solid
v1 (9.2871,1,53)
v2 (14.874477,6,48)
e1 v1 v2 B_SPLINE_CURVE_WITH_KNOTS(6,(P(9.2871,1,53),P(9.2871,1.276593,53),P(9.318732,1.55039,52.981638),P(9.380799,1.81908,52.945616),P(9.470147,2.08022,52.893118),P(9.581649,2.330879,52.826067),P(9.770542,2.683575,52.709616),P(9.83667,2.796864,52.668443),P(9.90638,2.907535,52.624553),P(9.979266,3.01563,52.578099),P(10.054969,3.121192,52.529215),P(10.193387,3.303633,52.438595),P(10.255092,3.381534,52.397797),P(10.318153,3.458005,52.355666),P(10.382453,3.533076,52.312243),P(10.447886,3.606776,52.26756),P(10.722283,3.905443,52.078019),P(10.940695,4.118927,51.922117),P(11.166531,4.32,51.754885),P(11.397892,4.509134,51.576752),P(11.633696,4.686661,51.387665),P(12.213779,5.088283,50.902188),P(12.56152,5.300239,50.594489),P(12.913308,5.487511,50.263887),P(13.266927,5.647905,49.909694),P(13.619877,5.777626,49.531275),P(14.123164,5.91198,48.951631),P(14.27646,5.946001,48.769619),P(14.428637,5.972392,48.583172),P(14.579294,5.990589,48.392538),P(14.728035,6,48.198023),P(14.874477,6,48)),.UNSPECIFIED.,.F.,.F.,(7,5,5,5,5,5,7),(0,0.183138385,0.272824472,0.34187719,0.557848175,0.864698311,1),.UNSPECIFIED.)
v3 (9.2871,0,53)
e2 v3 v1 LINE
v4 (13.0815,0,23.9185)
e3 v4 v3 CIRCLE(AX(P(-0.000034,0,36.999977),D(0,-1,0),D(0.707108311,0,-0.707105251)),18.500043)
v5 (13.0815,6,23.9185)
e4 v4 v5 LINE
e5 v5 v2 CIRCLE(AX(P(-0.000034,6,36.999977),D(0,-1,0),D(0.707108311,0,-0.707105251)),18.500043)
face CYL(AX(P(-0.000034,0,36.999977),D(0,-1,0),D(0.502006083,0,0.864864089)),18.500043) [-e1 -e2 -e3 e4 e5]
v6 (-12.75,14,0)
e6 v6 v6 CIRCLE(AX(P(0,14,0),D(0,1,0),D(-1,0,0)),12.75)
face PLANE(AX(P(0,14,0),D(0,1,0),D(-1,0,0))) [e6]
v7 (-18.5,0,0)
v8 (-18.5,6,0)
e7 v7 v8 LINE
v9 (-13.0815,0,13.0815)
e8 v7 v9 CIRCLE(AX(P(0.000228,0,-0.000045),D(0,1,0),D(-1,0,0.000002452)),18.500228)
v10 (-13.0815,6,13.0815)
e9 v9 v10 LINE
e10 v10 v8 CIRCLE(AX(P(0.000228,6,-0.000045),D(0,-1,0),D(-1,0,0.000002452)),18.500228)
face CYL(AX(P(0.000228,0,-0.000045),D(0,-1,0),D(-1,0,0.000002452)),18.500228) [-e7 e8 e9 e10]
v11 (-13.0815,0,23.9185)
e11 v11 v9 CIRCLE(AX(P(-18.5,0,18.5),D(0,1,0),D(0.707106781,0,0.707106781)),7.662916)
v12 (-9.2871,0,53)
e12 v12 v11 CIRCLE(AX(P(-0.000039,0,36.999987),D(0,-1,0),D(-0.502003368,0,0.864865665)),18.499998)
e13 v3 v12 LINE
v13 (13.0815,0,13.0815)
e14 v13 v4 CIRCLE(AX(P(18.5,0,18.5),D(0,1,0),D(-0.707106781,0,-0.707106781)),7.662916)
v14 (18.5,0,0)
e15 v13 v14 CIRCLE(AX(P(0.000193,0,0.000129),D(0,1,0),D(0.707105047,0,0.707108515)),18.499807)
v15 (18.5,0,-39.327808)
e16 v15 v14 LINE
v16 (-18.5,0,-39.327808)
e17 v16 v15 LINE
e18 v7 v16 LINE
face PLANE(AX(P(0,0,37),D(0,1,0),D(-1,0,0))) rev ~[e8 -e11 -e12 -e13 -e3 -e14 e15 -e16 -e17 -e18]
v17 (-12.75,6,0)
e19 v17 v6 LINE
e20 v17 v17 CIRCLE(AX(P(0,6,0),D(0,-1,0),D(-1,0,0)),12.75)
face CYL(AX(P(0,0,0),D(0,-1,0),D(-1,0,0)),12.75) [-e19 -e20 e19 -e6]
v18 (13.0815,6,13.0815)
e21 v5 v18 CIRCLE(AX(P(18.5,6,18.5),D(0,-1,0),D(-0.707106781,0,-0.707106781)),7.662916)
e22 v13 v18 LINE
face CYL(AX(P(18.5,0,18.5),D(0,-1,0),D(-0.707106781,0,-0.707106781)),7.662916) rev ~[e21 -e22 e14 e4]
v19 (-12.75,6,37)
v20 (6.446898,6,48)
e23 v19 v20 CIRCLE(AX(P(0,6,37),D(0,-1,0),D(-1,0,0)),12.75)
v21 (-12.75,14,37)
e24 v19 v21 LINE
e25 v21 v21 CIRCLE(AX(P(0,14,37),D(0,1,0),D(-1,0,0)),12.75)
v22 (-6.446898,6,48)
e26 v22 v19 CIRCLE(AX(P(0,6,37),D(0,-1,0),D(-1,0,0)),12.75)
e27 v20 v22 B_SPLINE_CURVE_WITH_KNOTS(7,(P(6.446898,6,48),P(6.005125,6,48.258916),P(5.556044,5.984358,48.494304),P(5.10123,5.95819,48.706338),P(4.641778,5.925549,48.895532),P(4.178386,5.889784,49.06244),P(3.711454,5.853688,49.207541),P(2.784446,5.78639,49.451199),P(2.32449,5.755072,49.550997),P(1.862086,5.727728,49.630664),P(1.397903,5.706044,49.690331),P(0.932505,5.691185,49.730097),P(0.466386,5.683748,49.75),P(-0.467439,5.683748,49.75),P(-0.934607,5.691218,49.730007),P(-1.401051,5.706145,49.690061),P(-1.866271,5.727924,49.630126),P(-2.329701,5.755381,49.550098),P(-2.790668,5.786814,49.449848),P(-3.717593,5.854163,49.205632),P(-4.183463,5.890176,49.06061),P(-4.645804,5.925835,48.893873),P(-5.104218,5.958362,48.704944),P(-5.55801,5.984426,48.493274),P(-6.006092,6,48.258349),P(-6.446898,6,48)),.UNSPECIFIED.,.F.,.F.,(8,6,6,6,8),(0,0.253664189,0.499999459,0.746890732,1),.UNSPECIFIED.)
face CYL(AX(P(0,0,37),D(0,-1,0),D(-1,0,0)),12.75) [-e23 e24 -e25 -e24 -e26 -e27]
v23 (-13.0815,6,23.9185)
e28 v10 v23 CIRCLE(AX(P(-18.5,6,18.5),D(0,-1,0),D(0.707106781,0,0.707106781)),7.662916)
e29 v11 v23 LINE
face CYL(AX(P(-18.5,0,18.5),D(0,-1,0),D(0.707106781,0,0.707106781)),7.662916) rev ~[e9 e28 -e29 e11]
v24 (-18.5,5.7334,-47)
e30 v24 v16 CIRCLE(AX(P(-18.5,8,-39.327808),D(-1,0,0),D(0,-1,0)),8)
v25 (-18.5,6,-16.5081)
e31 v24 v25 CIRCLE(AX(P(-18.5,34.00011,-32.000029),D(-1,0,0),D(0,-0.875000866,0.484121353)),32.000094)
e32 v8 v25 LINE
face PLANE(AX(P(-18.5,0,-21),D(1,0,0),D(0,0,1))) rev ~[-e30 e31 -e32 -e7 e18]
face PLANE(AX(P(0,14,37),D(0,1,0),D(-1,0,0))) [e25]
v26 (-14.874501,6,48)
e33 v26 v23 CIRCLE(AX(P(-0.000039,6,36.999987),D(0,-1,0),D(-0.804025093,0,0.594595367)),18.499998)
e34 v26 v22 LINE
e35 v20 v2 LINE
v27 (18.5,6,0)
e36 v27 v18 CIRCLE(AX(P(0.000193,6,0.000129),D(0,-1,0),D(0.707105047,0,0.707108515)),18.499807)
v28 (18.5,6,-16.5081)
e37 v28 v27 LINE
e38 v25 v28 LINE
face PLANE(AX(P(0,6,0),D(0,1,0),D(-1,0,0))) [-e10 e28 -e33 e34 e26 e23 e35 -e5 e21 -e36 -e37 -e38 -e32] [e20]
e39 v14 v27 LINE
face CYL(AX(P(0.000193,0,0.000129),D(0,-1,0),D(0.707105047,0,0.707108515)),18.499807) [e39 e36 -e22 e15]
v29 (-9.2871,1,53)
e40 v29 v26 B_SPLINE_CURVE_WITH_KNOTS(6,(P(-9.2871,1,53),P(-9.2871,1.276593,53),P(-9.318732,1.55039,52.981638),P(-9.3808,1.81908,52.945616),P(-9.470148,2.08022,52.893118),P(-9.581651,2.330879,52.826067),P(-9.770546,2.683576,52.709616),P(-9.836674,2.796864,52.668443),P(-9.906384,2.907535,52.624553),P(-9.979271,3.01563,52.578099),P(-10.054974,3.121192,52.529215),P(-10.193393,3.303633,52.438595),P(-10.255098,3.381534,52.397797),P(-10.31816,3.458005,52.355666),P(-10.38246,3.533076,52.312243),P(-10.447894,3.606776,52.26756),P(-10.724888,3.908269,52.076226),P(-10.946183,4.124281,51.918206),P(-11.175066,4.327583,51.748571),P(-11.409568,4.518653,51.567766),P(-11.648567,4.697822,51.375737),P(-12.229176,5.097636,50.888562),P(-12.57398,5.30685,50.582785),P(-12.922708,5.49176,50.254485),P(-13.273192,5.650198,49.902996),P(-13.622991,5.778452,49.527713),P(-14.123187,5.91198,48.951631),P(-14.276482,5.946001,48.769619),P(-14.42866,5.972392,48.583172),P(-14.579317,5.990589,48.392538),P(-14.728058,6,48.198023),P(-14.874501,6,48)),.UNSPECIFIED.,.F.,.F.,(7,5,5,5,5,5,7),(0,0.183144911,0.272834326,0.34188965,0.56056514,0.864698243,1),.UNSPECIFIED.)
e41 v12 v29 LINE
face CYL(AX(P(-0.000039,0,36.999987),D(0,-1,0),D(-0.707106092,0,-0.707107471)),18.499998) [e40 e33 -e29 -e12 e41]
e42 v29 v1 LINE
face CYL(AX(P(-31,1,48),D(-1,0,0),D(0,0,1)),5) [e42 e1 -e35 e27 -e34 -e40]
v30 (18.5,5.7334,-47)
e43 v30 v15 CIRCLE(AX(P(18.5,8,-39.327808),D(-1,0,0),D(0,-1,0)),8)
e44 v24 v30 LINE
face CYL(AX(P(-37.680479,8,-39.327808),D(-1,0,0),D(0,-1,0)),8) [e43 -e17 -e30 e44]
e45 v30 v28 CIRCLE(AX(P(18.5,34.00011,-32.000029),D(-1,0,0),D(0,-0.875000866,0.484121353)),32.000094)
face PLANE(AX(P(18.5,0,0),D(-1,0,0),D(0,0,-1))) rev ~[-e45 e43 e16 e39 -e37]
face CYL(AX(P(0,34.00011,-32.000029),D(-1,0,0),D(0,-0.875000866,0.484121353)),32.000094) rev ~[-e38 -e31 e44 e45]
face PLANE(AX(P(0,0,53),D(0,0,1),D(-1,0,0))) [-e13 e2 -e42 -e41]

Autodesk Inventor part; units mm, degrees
ref_plane "YZ Plane" through (0, 0, 0) normal (1, 0, 0) x (0, 1, 0)
ref_plane "XZ Plane" through (0, 0, 0) normal (0, 1, 0) x (-1, 0, 0)
ref_plane "XY Plane" through (0, 0, 0) normal (0, 0, 1) x (1, 0, 0)
sketch "Sketch1" plane through (0, 0, 0) normal (0, 1, 0) x (-1, 0, 0)
  line L0 (25.9, 0) -> (-25.9, 0) projected
  line L1 (0, -25.9) -> (0, 25.9) projected
  circle A0 centre (0, 0) radius 18.5 construction
  circle A1 centre (0, 0) radius 13 construction
  dimension "d0" = 37
  dimension "d1" = 26
sketch "Sketch2" plane through (0, 0, 0) normal (0, 1, 0) x (-1, 0, 0)
  line L0 (25.9, 0) -> (-25.9, 0) projected
  line L1 (0, -35.8) -> (0, 67.8) projected
  line L2 (-18.5, 53) -> (-18.5, -21)
  line L3 (-18.5, -21) -> (18.5, -21)
  line L4 (18.5, -21) -> (18.5, 53)
  line L5 (-18.5, 53) -> (18.5, 53)
  point P0 (0, 0)
  dimension "d3" = 37
  dimension "d29" = 21
  dimension "d30" = 53
extrude "Extrusion1" add sketch "Sketch2" along normal blind 6
sketch "Sketch6" plane through (0, 0, 0) normal (0, 1, 0) x (-1, 0, 0)
  line L0 (18.5, -21) -> (-18.5, -21) projected
  line L1 (18.5, 53) -> (18.5, -21) projected
  line L2 (-18.5, -21) -> (18.5, -21)
  line L3 (18.5, -21) -> (18.5, 53)
  line L4 (-18.5, 53) -> (-18.5, -21)
  line L5 (25.9, 0) -> (-25.9, 0) projected
  line L6 (0, -36.3) -> (0, 70.8) projected
  arc A0 (-16, 0) -> (16, 0) centre (0, 0) ccw
  line L7 (16, 0) -> (16, 53)
  line L8 (18.5, 53) -> (-18.5, 53) projected
  line L9 (16, 53) -> (18.5, 53)
  line L10 (-16, 0) -> (-16, 53)
  line L11 (-16, 53) -> (-18.5, 53)
  point P0 (-17.3617, -21)
  dimension "d18" = 32
extrude "Extrusion5" [suppressed]
sketch "Sketch4" plane through (0, 0, 0) normal (0, 0, 1) x (1, 0, 0)
  line L0 (-18.5, 0) -> (18.5, 0)
  line L1 (18.5, 0) -> (18.5, -2)
  line L2 (18.5, -2) -> (-18.5, -2)
  line L3 (-18.5, -2) -> (-18.5, 0)
  line L4 (-25.9, 0) -> (25.9, 0) projected
  line L5 (0, -2.4) -> (0, 0.4) projected
  point P0 (0, 0)
  dimension "d10" = 37
  dimension "d11" = 2
extrude "Extrusion6" [suppressed]
sketch "Sketch5" plane through (0, 0, 0) normal (0, 1, 0) x (-1, 0, 0)
  circle A0 centre (0, 0) radius 18.5 construction
  circle A1 centre (0, 0) radius 18.5 construction
  line L0 (25.9, 0) -> (-25.9, 0) projected
  line L1 (0, -28.9) -> (0, 26.4) projected
  line L2 (-18.5, -21) -> (18.5, -21)
  line L3 (18.5, -21) -> (18.5, -18.5)
  line L4 (18.5, -18.5) -> (-18.5, -18.5)
  line L5 (-18.5, -18.5) -> (-18.5, -21)
  dimension "d25" = 37
  dimension "d26" = 21
extrude "Extrusion7" [suppressed]
sketch "Sketch7" plane through (0, 0, 0) normal (0, 0, 1) x (1, 0, 0)
  line L0 (-18.5, 0) -> (18.5, 0)
  line L1 (18.5, 0) -> (18.5, -2)
  line L2 (18.5, -2) -> (-18.5, -2)
  line L3 (-18.5, -2) -> (-18.5, 0)
  line L4 (18.5, 0) -> (-18.5, 0) projected
  line L5 (-25.9, 0) -> (25.9, 0) projected
  line L6 (0, -2.4) -> (0, 0.4) projected
  point P0 (-16, 0)
  point P1 (16, 0)
  dimension "d53" = 2
  dimension "d54" = 18.5
extrude "Extrusion8" [suppressed]
sketch "Sketch8" plane through (0, 0, 0) normal (0, 1, 0) x (-1, 0, 0)
  circle A0 centre (0, 0) radius 12.75
  dimension "d34" = 25.5
extrude "Extrusion9" add sketch "Sketch8" along normal blind 14
pattern_linear "Rectangular Pattern1" count 2 spacing 37 along (0, 0, 1) of "Extrusion9"
sketch "Sketch9" plane through (0, 6, 0) normal (0, 1, 0) x (1, 0, 0)
  circle A0 centre (0, 0) radius 13
  circle A1 centre (0, 0) radius 15
  dimension "d40" = 26
  dimension "d41" = 30
extrude "Extrusion10" [suppressed]
sketch "Sketch10" plane through (0, 5, 0) normal (0, 1, 0) x (1, 0, 0)
  arc A0 (16, 0) -> (-16, 0) centre (0, 0) ccw projected
  line L0 (1.5, -18) -> (-1.5, -18)
  line L1 (-29.4, 0) -> (29.4, 0) projected
  line L2 (0, 36.3) -> (0, -70.8) projected
  line L3 (1.5, -12) -> (-1.5, -12)
  line L4 (1.5, -12) -> (1.5, -18)
  line L5 (-1.5, -18) -> (-1.5, -12)
  dimension "d48" = 3
  dimension "d49" = 12
  dimension "d50" = 6
extrude "Extrusion11" [suppressed]
fillet "Fillet1" radius 5 1 edges at (0, 6, 53)
sketch "Sketch11" plane through (0, 0, 0) normal (0, 1, 0) x (-1, 0, 0)
  line L0 (-18.5, -21) -> (18.5, -21)
  line L1 (18.5, -21) -> (18.5, -47)
  line L2 (18.5, -47) -> (-18.5, -47)
  line L3 (-18.5, -47) -> (-18.5, -21)
  line L4 (25.9, 0) -> (-25.9, 0) projected
  line L5 (0, -60.1) -> (0, 31.6) projected
  point P0 (0, 0)
  dimension "d57" = 26
  dimension "d58" = 21
  dimension "d59" = 37
extrude "Extrusion12" add sketch "Sketch11" along normal blind 6
sketch "Sketch12" plane through (0, 0, 0) normal (1, 0, 0) x (0, 1, 0)
  line L0 (6, 48) -> (6, -47) projected
  arc A0 (6, -16.5081) -> (5.7334, -47) centre (34, -32) ccw
  line L1 (-6.8, 0) -> (40.8, 0) projected
  line L2 (0, -66.5) -> (0, 70) projected
  line L3 (6, -16.5081) -> (6, -47)
  line L4 (6, -47) -> (5.7334, -47)
  line L5 (0, -47) -> (6, -47) projected
  point P0 (0, 0)
  dimension "d62" = 32
  dimension "d63" = 32
  dimension "d64" = 34
extrude "Extrusion13" cut sketch "Sketch12" along normal through all both and the other way through all contours L0 L4 A0
fillet "Fillet3" radius 8 1 edges at (0, 0, -47)
sketch "Sketch13" plane through (0, 0, 0) normal (0, 1, 0) x (-1, 0, 0)
  line L0 (25.9, 0) -> (-25.9, 0) projected
  line L1 (0, -67) -> (0, 73) projected
  line L2 (18.5, 53) -> (18.5, -39.3278) projected
  arc A0 (13.0815, 23.9185) -> (13.0815, 13.0815) centre (18.5, 18.5) ccw
  line L3 (-18.5, 48) -> (-18.5, -16.5081) projected
  arc A1 (-13.0815, 13.0815) -> (-13.0815, 23.9185) centre (-18.5, 18.5) ccw
  line L4 (18.5, 37) -> (18.5, 0)
  line L5 (-18.5, 0) -> (-18.5, 37)
  line L6 (18.5, 37) -> (18.5, 53)
  line L7 (-18.5, 53) -> (18.5, 53) projected
  line L8 (-18.5, 53) -> (-18.5, 37)
  arc A2 (-9.2871, 53) -> (-13.0815, 23.9185) centre (0, 37) ccw
  arc A3 (13.0815, 23.9185) -> (9.2871, 53) centre (0, 37) ccw
  arc A4 (-13.0815, 13.0815) -> (-18.5, 0) centre (0, 0) ccw
  arc A5 (18.5, 0) -> (13.0815, 13.0815) centre (0, 0) ccw
  dimension "d68" = 37
  dimension "d71" = 18.5
  dimension "d72" = 18.5
  dimension "d73" = 7.663
  dimension "d74" = 7.663
  dimension "d75" = 18.5
  dimension "d76" = 18.5
  dimension "d77" = 18.5
  dimension "d78" = 18.5
extrude "Extrusion14" cut sketch "Sketch13" along normal through all contours A5 A0 A3 L2 | A3 L7 L2 | L3 A2 A1 A4 | L3 L8 L7 A2
properties part number "NespressoSpeedfiller-tamper"
